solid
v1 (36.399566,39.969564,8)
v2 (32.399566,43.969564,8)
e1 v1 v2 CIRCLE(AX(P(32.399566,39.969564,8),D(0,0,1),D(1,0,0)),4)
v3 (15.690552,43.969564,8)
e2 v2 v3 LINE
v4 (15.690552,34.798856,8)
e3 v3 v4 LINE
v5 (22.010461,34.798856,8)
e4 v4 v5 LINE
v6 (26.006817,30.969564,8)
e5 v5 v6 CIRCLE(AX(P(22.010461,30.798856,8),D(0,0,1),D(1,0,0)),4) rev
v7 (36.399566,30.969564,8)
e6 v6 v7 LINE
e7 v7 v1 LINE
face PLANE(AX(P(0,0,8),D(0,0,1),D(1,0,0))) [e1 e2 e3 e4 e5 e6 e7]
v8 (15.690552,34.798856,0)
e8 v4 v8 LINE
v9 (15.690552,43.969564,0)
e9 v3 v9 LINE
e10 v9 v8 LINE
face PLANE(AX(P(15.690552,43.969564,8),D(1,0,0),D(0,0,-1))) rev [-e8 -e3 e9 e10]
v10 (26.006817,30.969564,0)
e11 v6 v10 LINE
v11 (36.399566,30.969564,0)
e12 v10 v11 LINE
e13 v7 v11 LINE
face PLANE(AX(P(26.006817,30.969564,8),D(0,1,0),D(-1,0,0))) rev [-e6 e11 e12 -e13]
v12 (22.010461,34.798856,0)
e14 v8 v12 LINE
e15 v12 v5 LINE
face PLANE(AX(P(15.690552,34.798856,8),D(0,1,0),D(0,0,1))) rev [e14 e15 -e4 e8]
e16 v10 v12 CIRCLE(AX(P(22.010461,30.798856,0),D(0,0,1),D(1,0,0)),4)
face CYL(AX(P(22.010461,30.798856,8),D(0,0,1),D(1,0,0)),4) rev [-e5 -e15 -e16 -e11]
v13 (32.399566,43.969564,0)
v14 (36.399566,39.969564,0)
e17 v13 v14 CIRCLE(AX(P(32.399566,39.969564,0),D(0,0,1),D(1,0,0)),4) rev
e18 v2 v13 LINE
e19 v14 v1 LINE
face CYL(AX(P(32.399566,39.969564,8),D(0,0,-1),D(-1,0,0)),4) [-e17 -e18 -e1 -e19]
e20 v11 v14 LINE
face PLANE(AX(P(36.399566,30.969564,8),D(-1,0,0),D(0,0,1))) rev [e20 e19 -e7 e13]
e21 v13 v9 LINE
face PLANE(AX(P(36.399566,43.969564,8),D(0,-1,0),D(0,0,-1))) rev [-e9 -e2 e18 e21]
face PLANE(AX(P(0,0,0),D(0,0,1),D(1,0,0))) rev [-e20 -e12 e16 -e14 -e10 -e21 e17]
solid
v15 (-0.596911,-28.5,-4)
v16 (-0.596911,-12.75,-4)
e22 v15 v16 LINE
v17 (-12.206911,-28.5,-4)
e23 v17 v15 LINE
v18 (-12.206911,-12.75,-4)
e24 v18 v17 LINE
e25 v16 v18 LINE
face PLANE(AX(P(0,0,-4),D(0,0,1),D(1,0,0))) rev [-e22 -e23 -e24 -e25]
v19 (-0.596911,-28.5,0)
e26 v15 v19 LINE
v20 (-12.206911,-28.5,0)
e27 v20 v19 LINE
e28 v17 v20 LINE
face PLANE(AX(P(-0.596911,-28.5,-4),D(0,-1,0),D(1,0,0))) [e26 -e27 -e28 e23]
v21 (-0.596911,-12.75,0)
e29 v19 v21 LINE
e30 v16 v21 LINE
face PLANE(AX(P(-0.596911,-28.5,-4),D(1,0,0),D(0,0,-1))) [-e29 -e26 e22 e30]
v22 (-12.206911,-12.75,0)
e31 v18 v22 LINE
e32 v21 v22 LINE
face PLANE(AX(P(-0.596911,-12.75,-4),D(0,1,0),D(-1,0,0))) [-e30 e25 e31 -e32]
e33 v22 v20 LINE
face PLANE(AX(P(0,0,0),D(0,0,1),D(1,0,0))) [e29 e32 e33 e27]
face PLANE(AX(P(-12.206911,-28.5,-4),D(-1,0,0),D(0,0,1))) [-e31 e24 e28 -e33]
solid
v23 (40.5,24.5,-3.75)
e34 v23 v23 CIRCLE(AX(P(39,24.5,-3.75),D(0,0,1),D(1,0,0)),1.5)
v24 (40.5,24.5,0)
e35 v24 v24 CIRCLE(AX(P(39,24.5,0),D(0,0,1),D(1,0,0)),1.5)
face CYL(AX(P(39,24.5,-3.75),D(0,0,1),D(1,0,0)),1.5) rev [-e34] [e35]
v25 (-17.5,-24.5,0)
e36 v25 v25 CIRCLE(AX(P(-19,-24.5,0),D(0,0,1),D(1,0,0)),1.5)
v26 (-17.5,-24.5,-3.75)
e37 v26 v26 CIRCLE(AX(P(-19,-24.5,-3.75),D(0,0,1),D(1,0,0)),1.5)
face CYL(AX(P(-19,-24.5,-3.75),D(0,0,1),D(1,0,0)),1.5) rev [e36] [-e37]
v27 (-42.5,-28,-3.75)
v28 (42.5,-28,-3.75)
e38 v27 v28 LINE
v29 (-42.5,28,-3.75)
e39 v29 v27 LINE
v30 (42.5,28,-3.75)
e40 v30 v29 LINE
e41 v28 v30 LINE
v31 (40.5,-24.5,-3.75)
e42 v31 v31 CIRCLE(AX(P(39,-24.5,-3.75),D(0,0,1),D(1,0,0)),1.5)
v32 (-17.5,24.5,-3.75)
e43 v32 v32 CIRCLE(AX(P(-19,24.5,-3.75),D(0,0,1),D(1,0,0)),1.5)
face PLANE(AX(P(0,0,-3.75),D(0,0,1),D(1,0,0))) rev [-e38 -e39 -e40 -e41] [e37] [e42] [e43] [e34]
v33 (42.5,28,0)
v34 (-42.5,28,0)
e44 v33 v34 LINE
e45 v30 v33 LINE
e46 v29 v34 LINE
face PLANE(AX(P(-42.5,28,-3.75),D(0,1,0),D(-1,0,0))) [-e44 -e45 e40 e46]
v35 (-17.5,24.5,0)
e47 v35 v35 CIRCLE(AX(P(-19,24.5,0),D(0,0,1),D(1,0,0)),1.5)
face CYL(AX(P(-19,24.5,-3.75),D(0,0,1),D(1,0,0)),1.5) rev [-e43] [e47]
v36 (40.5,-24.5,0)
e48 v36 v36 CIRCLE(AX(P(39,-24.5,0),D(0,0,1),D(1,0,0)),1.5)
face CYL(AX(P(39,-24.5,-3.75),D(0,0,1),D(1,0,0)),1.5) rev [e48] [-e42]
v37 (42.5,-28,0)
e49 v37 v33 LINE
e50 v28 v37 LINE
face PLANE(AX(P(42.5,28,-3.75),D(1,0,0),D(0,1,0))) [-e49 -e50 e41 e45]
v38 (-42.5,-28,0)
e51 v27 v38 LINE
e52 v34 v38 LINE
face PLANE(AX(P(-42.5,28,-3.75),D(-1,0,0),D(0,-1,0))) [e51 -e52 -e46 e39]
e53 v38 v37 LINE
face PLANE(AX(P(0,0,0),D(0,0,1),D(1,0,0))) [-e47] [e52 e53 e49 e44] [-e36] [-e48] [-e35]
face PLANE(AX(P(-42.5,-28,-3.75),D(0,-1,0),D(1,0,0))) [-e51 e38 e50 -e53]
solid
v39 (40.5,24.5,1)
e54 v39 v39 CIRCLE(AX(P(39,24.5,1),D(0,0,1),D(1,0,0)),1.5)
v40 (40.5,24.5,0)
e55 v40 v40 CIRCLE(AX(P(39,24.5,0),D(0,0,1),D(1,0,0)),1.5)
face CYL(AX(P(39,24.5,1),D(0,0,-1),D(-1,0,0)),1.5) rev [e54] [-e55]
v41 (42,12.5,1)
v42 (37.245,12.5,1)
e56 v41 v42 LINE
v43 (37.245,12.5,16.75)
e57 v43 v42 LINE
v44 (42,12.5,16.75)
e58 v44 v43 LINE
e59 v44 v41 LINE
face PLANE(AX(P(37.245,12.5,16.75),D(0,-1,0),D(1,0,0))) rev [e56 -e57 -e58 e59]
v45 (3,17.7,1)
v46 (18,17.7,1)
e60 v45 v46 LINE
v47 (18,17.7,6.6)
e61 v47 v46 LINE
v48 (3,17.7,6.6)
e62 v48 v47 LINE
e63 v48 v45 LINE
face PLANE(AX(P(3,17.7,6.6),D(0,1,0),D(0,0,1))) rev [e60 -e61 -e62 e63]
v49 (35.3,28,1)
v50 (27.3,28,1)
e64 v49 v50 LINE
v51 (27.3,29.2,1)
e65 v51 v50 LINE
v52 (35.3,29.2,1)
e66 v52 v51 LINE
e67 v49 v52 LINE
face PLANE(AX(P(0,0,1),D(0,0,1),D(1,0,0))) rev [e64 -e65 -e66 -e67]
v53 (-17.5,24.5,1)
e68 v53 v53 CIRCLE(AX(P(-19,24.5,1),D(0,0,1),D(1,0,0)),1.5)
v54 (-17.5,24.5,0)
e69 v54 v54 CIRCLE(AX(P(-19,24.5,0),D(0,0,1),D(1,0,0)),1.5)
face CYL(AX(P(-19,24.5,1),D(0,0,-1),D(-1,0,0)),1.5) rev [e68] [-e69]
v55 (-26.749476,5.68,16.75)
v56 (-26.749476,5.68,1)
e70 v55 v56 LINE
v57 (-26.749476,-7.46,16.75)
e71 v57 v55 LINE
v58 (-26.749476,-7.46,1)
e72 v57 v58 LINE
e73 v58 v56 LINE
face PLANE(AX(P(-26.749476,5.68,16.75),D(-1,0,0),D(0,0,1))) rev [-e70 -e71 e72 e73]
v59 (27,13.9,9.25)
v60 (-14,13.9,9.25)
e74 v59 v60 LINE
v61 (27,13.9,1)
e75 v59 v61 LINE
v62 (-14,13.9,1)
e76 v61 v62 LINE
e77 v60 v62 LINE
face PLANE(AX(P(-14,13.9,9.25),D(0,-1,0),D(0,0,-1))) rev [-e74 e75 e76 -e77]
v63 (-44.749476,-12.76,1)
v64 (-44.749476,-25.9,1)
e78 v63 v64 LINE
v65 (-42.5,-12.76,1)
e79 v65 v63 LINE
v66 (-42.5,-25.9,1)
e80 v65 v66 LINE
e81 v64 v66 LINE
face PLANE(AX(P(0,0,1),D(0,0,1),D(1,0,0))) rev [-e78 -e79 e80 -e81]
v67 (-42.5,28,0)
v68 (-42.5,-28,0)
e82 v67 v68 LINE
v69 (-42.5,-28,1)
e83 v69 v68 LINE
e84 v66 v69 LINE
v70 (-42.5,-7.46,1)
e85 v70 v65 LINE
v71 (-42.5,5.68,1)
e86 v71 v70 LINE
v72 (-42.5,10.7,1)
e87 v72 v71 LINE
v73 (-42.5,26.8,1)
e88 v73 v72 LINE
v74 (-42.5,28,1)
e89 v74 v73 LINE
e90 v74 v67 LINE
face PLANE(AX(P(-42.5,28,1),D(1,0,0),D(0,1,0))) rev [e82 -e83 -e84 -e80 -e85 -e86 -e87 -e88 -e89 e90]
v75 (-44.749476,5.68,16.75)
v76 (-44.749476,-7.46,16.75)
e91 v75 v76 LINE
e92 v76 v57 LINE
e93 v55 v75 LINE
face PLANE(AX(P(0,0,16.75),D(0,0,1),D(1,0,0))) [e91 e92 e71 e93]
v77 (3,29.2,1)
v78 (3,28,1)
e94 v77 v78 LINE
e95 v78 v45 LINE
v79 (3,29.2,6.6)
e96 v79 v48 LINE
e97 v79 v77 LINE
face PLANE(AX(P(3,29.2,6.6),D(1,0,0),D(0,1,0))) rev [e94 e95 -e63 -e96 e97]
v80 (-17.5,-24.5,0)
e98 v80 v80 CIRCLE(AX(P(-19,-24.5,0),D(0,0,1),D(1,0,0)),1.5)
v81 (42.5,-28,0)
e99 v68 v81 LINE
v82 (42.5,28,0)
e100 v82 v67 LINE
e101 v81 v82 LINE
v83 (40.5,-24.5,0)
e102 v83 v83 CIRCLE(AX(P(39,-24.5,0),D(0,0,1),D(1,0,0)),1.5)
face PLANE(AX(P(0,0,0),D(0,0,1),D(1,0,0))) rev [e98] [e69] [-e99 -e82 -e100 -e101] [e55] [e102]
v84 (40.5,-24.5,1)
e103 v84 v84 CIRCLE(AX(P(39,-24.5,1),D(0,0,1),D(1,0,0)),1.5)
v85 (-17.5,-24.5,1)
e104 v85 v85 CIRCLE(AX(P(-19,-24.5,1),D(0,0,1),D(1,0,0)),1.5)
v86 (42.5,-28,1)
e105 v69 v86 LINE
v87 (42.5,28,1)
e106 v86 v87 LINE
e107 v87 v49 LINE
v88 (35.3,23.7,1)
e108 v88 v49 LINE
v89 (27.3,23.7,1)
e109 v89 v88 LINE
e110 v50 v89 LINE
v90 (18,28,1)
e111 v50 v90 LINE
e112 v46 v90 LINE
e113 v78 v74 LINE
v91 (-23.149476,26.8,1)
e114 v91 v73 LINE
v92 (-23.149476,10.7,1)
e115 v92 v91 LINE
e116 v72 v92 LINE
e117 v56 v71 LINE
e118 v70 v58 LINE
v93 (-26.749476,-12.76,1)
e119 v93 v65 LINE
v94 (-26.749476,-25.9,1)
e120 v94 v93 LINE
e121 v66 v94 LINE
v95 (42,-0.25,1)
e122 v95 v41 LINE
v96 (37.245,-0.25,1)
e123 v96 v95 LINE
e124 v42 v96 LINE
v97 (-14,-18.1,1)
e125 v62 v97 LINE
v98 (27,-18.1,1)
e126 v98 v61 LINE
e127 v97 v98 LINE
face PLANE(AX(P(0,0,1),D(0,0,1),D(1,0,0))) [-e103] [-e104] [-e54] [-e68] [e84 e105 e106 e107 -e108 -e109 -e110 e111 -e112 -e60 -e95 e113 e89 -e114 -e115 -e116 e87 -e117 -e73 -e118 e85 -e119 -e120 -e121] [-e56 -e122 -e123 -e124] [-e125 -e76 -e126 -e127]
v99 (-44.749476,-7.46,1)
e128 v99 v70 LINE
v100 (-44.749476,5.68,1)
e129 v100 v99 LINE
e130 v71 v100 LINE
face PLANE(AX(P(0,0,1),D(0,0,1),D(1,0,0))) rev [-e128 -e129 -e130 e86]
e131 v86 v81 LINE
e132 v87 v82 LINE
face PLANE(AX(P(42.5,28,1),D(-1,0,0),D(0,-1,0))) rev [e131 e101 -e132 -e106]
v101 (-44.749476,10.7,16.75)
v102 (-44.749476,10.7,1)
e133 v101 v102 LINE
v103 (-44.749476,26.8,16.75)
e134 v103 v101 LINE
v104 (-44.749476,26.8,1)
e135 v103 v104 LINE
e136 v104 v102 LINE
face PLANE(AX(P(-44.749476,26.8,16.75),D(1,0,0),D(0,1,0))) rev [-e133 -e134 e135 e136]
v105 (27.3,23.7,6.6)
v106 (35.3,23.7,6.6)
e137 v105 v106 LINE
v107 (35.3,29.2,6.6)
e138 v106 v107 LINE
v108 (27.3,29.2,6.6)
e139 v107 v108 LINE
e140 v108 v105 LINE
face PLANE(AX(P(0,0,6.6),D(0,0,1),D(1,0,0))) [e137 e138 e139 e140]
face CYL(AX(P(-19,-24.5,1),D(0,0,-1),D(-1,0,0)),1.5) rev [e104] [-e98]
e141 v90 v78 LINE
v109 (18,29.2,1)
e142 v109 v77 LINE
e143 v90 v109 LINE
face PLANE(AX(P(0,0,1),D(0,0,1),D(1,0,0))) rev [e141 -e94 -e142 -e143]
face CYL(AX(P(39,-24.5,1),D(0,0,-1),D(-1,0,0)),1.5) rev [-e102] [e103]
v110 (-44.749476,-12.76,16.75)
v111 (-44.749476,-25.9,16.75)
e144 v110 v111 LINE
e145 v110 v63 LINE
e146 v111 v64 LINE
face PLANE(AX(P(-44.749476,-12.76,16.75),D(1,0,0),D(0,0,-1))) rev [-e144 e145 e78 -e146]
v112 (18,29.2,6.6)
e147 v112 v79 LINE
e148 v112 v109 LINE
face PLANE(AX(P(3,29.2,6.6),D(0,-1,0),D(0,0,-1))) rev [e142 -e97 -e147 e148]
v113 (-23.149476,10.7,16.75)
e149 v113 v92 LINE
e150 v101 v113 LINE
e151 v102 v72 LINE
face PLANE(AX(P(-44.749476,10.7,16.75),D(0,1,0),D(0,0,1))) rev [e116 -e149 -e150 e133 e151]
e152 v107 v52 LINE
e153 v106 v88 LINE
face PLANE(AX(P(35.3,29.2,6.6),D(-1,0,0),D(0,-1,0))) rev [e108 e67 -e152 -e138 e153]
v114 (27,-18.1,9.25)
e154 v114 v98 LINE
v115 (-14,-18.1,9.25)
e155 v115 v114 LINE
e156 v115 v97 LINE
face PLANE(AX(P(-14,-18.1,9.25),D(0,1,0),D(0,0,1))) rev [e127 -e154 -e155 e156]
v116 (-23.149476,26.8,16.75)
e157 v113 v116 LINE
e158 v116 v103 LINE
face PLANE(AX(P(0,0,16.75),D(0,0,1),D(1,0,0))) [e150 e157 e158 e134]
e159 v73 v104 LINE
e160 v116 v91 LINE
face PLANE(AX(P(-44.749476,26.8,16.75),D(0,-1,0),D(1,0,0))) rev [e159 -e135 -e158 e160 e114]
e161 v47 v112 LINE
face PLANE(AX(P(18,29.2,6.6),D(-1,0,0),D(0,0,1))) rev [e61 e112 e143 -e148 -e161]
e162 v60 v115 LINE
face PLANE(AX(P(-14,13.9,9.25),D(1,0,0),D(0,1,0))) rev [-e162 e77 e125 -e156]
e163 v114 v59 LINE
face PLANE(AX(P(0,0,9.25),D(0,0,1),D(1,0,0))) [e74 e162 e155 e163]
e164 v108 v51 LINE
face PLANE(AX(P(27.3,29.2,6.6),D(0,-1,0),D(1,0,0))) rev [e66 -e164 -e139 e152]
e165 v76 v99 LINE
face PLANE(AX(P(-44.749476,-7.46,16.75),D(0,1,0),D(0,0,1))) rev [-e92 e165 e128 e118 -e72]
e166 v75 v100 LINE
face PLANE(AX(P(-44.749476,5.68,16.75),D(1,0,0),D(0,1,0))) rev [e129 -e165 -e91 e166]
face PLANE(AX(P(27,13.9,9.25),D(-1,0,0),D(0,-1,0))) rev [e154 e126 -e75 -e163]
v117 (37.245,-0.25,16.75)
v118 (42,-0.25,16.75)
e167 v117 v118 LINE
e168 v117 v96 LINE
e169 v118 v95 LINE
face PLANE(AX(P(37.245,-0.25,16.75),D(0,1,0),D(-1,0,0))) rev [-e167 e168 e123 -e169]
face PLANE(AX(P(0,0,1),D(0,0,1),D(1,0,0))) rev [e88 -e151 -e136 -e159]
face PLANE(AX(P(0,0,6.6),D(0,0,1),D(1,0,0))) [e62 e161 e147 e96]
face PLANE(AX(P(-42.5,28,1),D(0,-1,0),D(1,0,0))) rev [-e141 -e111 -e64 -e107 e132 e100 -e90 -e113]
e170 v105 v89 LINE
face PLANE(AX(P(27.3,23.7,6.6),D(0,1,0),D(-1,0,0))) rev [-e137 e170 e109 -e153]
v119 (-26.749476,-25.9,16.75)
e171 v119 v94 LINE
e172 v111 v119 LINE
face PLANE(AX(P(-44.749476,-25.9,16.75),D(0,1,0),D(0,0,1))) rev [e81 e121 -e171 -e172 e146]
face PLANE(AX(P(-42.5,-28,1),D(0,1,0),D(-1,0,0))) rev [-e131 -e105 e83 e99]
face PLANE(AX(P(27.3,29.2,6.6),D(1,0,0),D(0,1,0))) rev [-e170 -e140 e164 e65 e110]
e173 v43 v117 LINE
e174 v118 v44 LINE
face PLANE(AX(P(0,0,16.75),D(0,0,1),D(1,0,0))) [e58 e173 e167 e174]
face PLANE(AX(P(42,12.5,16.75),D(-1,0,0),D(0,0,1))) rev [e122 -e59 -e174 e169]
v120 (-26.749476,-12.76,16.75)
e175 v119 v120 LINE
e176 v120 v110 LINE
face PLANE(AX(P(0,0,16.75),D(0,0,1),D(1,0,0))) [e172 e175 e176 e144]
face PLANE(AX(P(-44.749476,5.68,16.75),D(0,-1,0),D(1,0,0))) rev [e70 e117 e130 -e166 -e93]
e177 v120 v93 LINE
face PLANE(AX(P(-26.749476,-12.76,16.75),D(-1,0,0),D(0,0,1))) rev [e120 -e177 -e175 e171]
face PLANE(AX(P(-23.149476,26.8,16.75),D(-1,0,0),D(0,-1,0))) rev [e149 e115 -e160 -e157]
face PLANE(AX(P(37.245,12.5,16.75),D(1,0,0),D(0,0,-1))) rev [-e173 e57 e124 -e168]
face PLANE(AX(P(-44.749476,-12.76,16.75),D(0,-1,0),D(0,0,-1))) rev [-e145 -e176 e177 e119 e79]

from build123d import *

# Parameters (mm, degrees)
SKETCH1_W           = 85
SKETCH1_H           = 56
SKETCH1_R           = 1.5
BOSS_EXTRUDE1_DEPTH = 1
SKETCH1_2_W         = 85
SKETCH1_2_H         = 56
SKETCH1_2_R         = 1.5
BOSS_EXTRUDE2_DEPTH = 3.75
SKETCH3_W           = 41
SKETCH3_H           = 32
BOSS_EXTRUDE3_DEPTH = 8.25
SKETCH4_W           = 18
SKETCH4_H           = 13.14
SKETCH4_W_2         = 4.755
SKETCH4_H_2         = 12.75
SKETCH4_W_3         = 21.6
SKETCH4_H_3         = 16.1
BOSS_EXTRUDE4_DEPTH = 15.75
SKETCH5_W           = 15
SKETCH5_H           = 11.5
SKETCH5_W_2         = 8
SKETCH5_H_2         = 5.5
BOSS_EXTRUDE5_DEPTH = 5.6
SKETCH6_W           = 11.61
SKETCH6_H           = 15.75
BOSS_EXTRUDE6_DEPTH = 4
BOSS_EXTRUDE7_DEPTH = 8
FILLET1_R           = 4


with BuildPart() as part:
    # Sketch1 → Boss-Extrude1 (new body)
    with BuildSketch(Plane.XY):
        Rectangle(SKETCH1_W, SKETCH1_H)
        with Locations((-19.000000078, 24.5)):
            Circle(SKETCH1_R, mode=Mode.SUBTRACT)
        with Locations((-19.000000078, -24.5)):
            Circle(SKETCH1_R, mode=Mode.SUBTRACT)
        with Locations((39, 24.5)):
            Circle(SKETCH1_R, mode=Mode.SUBTRACT)
        with Locations((39, -24.5)):
            Circle(SKETCH1_R, mode=Mode.SUBTRACT)
    extrude(amount=BOSS_EXTRUDE1_DEPTH)

    # Sketch3 → Boss-Extrude3 (add)
    with BuildSketch(Plane.XY.offset(1)):
        with Locations((6.5, -2.1)):
            Rectangle(SKETCH3_W, SKETCH3_H)
    extrude(amount=BOSS_EXTRUDE3_DEPTH)

    # Sketch4 → Boss-Extrude4 (add)
    with BuildSketch(Plane.XY.offset(1)):
        with Locations((-35.74947609, -0.89)):
            Rectangle(SKETCH4_W, SKETCH4_H)
        with Locations((-35.74947609, -19.33)):
            Rectangle(SKETCH4_W, SKETCH4_H)
        with Locations((39.6225, 6.125)):
            Rectangle(SKETCH4_W_2, SKETCH4_H_2)
        with Locations((-33.94947609, 18.75)):
            Rectangle(SKETCH4_W_3, SKETCH4_H_3)
    extrude(amount=BOSS_EXTRUDE4_DEPTH)

    # Sketch5 → Boss-Extrude5 (add)
    with BuildSketch(Plane.XY.offset(1)):
        with Locations((10.5, 23.45)):
            Rectangle(SKETCH5_W, SKETCH5_H)
        with Locations((31.3, 26.45)):
            Rectangle(SKETCH5_W_2, SKETCH5_H_2)
    extrude(amount=BOSS_EXTRUDE5_DEPTH)


with BuildPart() as body_2:
    # Sketch1<2> → Boss-Extrude2 (new body)
    with BuildSketch(Plane.XY):
        Rectangle(SKETCH1_2_W, SKETCH1_2_H)
        with Locations((-19.000000078, 24.5)):
            Circle(SKETCH1_2_R, mode=Mode.SUBTRACT)
        with Locations((-19.000000078, -24.5)):
            Circle(SKETCH1_2_R, mode=Mode.SUBTRACT)
        with Locations((39, 24.5)):
            Circle(SKETCH1_2_R, mode=Mode.SUBTRACT)
        with Locations((39, -24.5)):
            Circle(SKETCH1_2_R, mode=Mode.SUBTRACT)
    extrude(amount=-BOSS_EXTRUDE2_DEPTH)


with BuildPart() as body_3:
    # Sketch6 → Boss-Extrude6 (new body)
    with BuildSketch(Plane.XY):
        with Locations((-6.401910681, -20.625)):
            Rectangle(SKETCH6_W, SKETCH6_H)
    extrude(amount=-BOSS_EXTRUDE6_DEPTH)


with BuildPart() as body_4:
    # Sketch7 → Boss-Extrude7 (new body)
    with BuildSketch(Plane.XY):
        Polygon((36.399565533, 30.969563873), (36.399565533, 43.969563873), (15.69055196, 43.969563873), (15.69055196, 34.798856494), (26.0068166, 34.798856494), (26.0068166, 30.969563873), align=None)
    extrude(amount=BOSS_EXTRUDE7_DEPTH)

    # Fillet1
    # the kernel refuses this fillet: 4 mm, written as the material it adds along each edge
    with BuildSketch(Plane(origin=(26.0068166, 34.798856494, 0), x_dir=(-1, 0, 0), z_dir=(0, 0, 1))) as fillet1_piece_1:
        with BuildLine():
            CenterArc((3.996355714, 4), FILLET1_R, 182.445945938, 87.554054062)
            Line((0, 3.829292621), (0, 0))
            Line((0, 0), (3.996355714, 0))
        make_face()
    extrude(amount=8)
    # the kernel refuses this fillet: 4 mm, written as the material it takes off along each edge
    with BuildSketch(Plane(origin=(36.399565533, 43.969563873, -10), x_dir=(0, -1, 0), z_dir=(0, 0, 1))) as fillet1_2_piece_1:
        with BuildLine():
            CenterArc((FILLET1_R, -FILLET1_R), FILLET1_R, 90, 90)
            Line((0, -FILLET1_R), (0, 0))
            Line((0, 0), (FILLET1_R, 0))
        make_face()
    extrude(amount=28, mode=Mode.SUBTRACT)


solid = Compound([part.part, body_2.part, body_3.part, body_4.part])
